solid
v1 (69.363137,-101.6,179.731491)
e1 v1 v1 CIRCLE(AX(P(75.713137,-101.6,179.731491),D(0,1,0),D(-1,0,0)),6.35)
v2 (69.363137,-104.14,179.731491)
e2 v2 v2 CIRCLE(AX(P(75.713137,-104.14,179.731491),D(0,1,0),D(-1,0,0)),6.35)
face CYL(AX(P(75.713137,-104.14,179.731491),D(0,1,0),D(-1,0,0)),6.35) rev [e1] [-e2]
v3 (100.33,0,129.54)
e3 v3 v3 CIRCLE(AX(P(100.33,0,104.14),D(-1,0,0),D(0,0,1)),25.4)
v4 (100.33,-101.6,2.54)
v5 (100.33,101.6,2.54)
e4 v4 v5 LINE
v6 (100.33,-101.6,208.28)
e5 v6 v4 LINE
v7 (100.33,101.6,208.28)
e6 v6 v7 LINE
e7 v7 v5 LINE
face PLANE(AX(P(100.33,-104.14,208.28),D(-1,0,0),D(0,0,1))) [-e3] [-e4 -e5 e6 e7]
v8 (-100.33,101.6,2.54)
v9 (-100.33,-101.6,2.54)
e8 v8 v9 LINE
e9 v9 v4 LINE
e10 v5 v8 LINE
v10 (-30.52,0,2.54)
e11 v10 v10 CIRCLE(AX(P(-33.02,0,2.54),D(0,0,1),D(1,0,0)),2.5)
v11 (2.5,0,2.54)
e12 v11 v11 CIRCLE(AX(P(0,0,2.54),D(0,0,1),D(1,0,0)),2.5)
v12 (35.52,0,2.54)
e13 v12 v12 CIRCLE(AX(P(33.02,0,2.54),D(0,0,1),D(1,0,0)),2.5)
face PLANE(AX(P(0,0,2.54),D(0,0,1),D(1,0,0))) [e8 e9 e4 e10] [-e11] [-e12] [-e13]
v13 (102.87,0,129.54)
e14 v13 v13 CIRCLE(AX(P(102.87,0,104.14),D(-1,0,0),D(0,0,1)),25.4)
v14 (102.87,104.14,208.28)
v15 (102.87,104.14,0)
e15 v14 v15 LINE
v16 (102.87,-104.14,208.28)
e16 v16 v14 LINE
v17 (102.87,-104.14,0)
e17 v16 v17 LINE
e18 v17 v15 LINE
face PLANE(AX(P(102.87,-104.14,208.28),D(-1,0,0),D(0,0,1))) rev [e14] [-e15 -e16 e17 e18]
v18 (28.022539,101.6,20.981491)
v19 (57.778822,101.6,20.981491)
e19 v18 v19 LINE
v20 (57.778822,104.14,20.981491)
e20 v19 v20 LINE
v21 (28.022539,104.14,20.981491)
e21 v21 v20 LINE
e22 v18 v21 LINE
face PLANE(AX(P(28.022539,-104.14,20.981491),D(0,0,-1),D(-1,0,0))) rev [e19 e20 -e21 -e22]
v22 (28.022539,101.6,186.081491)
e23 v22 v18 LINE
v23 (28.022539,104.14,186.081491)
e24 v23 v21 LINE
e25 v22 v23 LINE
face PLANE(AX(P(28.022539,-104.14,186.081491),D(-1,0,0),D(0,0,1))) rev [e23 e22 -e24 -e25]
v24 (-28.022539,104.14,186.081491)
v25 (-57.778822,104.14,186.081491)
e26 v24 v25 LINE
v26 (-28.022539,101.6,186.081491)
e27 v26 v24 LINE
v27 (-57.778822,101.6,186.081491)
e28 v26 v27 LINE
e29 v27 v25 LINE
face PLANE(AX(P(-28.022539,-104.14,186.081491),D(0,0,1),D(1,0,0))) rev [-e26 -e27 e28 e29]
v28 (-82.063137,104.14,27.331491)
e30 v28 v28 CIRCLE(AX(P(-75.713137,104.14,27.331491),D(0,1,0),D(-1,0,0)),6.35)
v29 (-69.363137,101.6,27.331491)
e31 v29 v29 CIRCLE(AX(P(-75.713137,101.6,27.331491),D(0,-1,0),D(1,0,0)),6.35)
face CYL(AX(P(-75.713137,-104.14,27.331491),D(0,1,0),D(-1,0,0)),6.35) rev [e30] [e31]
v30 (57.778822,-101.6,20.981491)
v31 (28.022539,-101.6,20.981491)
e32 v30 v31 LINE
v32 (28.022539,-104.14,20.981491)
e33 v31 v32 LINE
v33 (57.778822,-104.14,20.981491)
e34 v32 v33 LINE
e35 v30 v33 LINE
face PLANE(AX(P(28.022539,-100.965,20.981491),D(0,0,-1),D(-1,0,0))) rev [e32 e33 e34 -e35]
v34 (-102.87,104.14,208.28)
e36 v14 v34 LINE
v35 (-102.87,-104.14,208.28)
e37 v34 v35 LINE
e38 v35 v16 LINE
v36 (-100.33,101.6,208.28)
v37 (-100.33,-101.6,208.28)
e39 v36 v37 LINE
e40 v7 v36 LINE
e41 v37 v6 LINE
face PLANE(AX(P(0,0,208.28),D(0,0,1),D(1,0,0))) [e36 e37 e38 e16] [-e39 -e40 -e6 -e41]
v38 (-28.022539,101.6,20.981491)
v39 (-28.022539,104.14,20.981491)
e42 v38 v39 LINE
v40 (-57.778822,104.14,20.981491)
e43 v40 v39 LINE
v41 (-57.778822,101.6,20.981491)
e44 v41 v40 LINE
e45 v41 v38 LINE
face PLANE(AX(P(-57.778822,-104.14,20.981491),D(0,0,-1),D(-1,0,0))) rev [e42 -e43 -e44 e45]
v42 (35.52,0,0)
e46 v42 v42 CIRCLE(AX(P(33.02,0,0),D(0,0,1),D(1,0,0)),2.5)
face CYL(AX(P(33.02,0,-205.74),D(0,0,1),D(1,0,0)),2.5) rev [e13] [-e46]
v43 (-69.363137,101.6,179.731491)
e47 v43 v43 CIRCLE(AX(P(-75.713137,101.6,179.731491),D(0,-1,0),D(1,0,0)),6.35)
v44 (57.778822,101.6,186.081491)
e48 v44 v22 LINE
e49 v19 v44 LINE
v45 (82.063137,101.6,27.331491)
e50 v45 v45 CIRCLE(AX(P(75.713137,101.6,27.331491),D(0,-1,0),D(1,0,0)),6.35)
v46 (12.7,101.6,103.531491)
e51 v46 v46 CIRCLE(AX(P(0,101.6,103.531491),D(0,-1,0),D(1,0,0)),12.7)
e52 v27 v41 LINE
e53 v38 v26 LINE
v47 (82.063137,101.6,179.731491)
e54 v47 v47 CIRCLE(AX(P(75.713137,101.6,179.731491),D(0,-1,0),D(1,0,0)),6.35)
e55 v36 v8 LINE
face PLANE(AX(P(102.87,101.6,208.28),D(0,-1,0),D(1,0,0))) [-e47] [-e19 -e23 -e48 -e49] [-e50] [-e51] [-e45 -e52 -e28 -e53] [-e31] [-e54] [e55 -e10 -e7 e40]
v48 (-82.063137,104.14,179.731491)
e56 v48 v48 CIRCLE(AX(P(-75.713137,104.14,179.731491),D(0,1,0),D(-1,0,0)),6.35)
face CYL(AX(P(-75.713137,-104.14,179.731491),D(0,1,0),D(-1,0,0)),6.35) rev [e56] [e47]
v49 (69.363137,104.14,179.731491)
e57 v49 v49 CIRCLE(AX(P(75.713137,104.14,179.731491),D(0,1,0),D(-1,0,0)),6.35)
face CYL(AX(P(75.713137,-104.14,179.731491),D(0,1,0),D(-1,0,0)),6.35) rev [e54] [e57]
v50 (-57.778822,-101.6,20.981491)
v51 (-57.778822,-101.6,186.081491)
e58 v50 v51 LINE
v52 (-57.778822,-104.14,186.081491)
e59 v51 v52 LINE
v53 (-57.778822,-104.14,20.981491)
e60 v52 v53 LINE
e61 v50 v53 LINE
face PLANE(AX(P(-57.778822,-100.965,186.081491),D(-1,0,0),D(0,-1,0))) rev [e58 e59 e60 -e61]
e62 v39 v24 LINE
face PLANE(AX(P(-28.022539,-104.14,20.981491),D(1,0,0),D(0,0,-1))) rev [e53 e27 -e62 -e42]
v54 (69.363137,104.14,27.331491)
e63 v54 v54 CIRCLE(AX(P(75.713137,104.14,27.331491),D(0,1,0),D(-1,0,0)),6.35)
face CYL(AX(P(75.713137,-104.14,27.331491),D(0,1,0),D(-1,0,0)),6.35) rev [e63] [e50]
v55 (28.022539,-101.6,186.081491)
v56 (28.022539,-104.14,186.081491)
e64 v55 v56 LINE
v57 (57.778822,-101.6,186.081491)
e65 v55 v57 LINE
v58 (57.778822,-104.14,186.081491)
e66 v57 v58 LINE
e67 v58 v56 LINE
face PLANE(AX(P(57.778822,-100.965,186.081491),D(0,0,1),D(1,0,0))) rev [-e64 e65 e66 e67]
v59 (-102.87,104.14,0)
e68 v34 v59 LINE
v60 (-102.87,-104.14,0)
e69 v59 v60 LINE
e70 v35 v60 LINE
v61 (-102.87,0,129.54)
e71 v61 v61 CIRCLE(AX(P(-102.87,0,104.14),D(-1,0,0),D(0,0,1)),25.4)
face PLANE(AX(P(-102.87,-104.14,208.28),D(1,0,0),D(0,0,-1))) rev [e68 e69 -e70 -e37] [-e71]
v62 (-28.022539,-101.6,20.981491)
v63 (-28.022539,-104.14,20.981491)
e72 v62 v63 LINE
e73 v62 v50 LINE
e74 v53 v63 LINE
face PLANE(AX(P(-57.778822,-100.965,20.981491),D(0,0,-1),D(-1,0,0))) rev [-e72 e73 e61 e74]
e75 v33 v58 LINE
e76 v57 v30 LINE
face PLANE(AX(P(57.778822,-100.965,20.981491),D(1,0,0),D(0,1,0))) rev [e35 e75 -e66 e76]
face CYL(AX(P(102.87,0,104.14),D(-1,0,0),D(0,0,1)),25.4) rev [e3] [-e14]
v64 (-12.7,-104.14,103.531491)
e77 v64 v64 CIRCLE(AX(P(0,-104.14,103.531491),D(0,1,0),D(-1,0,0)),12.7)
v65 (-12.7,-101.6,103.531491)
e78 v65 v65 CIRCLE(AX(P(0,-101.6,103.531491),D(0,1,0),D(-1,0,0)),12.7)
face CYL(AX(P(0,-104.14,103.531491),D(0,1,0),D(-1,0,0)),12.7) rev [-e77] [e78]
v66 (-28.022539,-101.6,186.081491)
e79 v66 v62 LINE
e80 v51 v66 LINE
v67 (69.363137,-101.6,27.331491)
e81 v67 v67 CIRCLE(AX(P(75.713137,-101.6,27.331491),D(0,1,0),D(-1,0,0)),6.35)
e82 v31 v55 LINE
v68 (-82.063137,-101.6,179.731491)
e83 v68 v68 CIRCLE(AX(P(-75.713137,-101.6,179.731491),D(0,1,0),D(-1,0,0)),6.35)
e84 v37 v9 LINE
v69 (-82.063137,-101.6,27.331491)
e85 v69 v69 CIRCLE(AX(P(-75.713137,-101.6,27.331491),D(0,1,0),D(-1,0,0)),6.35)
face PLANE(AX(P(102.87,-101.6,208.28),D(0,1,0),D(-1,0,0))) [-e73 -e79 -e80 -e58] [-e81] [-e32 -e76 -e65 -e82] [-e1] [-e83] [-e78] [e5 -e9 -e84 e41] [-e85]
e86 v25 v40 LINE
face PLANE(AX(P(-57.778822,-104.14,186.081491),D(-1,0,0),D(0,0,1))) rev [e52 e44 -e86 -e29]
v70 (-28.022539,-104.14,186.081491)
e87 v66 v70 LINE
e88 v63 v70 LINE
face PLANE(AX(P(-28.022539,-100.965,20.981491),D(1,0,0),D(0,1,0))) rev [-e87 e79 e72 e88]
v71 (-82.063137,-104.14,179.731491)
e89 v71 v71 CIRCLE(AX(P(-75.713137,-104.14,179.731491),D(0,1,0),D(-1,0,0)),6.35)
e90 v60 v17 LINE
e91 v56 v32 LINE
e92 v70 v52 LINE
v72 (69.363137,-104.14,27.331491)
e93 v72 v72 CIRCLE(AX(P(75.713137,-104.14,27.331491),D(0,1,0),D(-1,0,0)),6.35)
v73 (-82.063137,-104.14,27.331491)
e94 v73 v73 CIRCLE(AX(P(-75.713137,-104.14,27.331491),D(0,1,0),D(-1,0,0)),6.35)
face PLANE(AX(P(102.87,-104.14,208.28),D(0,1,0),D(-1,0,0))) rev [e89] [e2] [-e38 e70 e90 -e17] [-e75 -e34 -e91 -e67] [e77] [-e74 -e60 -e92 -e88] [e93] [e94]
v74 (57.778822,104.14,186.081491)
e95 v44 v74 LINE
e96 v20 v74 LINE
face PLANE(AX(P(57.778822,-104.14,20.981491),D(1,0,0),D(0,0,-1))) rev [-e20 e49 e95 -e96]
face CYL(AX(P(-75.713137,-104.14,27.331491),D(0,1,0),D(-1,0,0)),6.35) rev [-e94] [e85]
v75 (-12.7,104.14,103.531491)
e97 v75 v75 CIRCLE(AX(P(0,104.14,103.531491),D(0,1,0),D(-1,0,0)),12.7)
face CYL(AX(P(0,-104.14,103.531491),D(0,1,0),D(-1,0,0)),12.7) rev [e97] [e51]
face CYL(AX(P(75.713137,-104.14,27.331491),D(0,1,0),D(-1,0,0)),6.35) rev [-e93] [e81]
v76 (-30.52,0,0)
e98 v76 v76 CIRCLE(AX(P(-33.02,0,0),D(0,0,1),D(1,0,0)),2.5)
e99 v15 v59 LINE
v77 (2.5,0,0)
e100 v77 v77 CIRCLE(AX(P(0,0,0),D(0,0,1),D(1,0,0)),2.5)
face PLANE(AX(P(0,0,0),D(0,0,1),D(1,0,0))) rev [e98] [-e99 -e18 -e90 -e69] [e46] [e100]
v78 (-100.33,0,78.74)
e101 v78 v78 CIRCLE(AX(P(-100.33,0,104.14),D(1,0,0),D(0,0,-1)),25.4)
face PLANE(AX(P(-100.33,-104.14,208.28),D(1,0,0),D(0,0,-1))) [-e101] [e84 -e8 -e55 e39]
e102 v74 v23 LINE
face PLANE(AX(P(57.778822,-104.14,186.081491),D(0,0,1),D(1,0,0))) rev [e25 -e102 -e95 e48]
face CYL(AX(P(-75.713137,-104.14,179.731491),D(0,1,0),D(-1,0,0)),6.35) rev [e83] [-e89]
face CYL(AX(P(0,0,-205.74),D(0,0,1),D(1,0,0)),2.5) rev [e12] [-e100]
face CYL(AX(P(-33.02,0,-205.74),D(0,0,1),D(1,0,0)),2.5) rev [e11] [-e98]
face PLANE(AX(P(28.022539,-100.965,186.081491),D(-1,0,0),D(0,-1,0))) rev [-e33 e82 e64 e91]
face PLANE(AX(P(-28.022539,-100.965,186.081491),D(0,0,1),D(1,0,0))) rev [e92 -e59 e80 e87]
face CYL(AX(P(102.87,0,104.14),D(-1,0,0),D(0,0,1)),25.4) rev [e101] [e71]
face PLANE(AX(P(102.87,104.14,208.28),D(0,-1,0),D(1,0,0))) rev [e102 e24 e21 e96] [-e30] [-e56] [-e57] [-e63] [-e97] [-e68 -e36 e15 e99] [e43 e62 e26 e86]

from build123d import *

# Parameters (mm, degrees)
SKETCH1_W               = 205.74
SKETCH1_H               = 208.28
BOSS_EXTRUDE1_DEPTH     = 208.28
SHELL1_T                = -2.54
CUT_EXTRUDE1_DEPTH      = 311.309108632
CUT_EXTRUDE1_DEPTH_BACK = 311.309108632
SKETCH2_R               = 12.7
SKETCH2_R_2             = 6.35
SKETCH4_R               = 2.5
CUT_EXTRUDE2_DEPTH      = 208.28
SKETCH5_W               = 17.056283611
SKETCH5_H               = 152.4
BOSS_EXTRUDE2_DEPTH     = 3.175
CHAMFER1_SIZE           = 6.35
SKETCH6_W               = 29.756283611
SKETCH6_H               = 165.1
CUT_EXTRUDE3_DEPTH      = 3.175
SKETCH7_R               = 25.4
CUT_EXTRUDE4_DEPTH      = 312.810864508
SKETCH8_W               = 29.756283611
SKETCH8_H               = 165.1
CUT_EXTRUDE5_DEPTH      = 315.127382323


with BuildPart() as part:
    # Sketch1 → Boss-Extrude1 (new body)
    with BuildSketch(Plane.XY):
        Rectangle(SKETCH1_W, SKETCH1_H)
    extrude(amount=BOSS_EXTRUDE1_DEPTH)

    # Shell1
    shell1_openings = [part.faces().sort_by_distance(p)[0] for p in [
        (0, 0, 208.28),
    ]]
    offset(amount=SHELL1_T, openings=shell1_openings, kind=Kind.INTERSECTION)

    # Sketch2 → Cut-Extrude1 (cut, two sides: drawn at the far end of the back side and taken through both)
    with BuildSketch(Plane(origin=(0, -101.6, 0), x_dir=(1, 0, 0), z_dir=(0, 1, 0)).offset(-CUT_EXTRUDE1_DEPTH_BACK)):
        with Locations(Location((0, -103.531491014, 0), (0, 0, 180))):
            Circle(SKETCH2_R)
        with Locations(Location((-75.713137358, -27.331491014, 0), (0, 0, 180))):
            Circle(SKETCH2_R_2)
        with Locations(Location((75.713137358, -27.331491014, 0), (0, 0, 180))):
            Circle(SKETCH2_R_2)
        with Locations(Location((75.713137358, -179.731491014, 0), (0, 0, 180))):
            Circle(SKETCH2_R_2)
        with Locations(Location((-75.713137358, -179.731491014, 0), (0, 0, 180))):
            Circle(SKETCH2_R_2)
    extrude(amount=CUT_EXTRUDE1_DEPTH + CUT_EXTRUDE1_DEPTH_BACK, mode=Mode.SUBTRACT)

    # Sketch4 → Cut-Extrude2 (cut)
    with BuildSketch(Plane.XY.offset(2.54)):
        Circle(SKETCH4_R)
        with Locations((33.02, 0)):
            Circle(SKETCH4_R)
        with Locations((-33.02, 0)):
            Circle(SKETCH4_R)
    extrude(amount=-CUT_EXTRUDE2_DEPTH, mode=Mode.SUBTRACT)

    # Sketch5 → Boss-Extrude2 (add)
    with BuildSketch(Plane(origin=(0, 104.14, 0), x_dir=(1, 0, 0), z_dir=(0, 1, 0))):
        with Locations((-42.900680362, -103.531491014)):
            Rectangle(SKETCH5_W, SKETCH5_H)
        with Locations((42.900680362, -103.531491014)):
            Rectangle(SKETCH5_W, SKETCH5_H)
    extrude(amount=BOSS_EXTRUDE2_DEPTH)

    # Chamfer1
    # the kernel refuses this chamfer: 6.35 mm, written as the material it adds along each edge
    with BuildSketch(Plane(origin=(51.428822168, 104.14, 179.731491014), x_dir=(0, -0.027495876610585696, 0.9996219169112966), z_dir=(-1, 0, 0))) as chamfer1_piece_1_section:
        Polygon((CHAMFER1_SIZE * 0.999621916911, CHAMFER1_SIZE * 0.0274958766106), (-CHAMFER1_SIZE * 0.0274958766106, CHAMFER1_SIZE * 0.999621916911), (0, 0), align=None)
    chamfer1_piece_1 = extrude(amount=17.05628361, mode=Mode.PRIVATE)
    chamfer1_piece_1 = split(chamfer1_piece_1, bisect_by=Plane(origin=(42.900680363, 107.315, 182.229587898), z_dir=(0, -1, 0)), keep=Keep.TOP, mode=Mode.PRIVATE)
    add(chamfer1_piece_1)
    with BuildSketch(Plane(origin=(51.428822168, 104.14, 27.331491014), x_dir=(0.9996219169112968, -0.027495876610583406, 0), z_dir=(0, 0, 1))) as chamfer1_piece_2_section:
        Polygon((CHAMFER1_SIZE * 0.999621916911, CHAMFER1_SIZE * 0.0274958766106), (-CHAMFER1_SIZE * 0.0274958766106, CHAMFER1_SIZE * 0.999621916911), (0, 0), align=None)
    chamfer1_piece_2 = extrude(amount=152.4, mode=Mode.PRIVATE)
    chamfer1_piece_2 = split(chamfer1_piece_2, bisect_by=Plane(origin=(53.926919052, 107.315, 103.531491014), z_dir=(0, -1, 0)), keep=Keep.TOP, mode=Mode.PRIVATE)
    add(chamfer1_piece_2)
    with BuildSketch(Plane(origin=(34.372538557, 104.14, 27.331491014), x_dir=(0, -0.027495876610585654, -0.9996219169112968), z_dir=(1, 0, 0))) as chamfer1_piece_3_section:
        Polygon((CHAMFER1_SIZE * 0.999621916911, CHAMFER1_SIZE * 0.0274958766106), (-CHAMFER1_SIZE * 0.0274958766106, CHAMFER1_SIZE * 0.999621916911), (0, 0), align=None)
    chamfer1_piece_3 = extrude(amount=17.05628361, mode=Mode.PRIVATE)
    chamfer1_piece_3 = split(chamfer1_piece_3, bisect_by=Plane(origin=(42.900680363, 107.315, 24.83339413), z_dir=(0, -1, 0)), keep=Keep.TOP, mode=Mode.PRIVATE)
    add(chamfer1_piece_3)
    with BuildSketch(Plane(origin=(34.372538557, 104.14, 179.731491014), x_dir=(-0.9996219169112968, -0.027495876610585685, 0), z_dir=(0, 0, -1))) as chamfer1_piece_4_section:
        Polygon((CHAMFER1_SIZE * 0.999621916911, CHAMFER1_SIZE * 0.0274958766106), (-CHAMFER1_SIZE * 0.0274958766106, CHAMFER1_SIZE * 0.999621916911), (0, 0), align=None)
    chamfer1_piece_4 = extrude(amount=152.4, mode=Mode.PRIVATE)
    chamfer1_piece_4 = split(chamfer1_piece_4, bisect_by=Plane(origin=(31.874441673, 107.315, 103.531491014), z_dir=(0, -1, 0)), keep=Keep.TOP, mode=Mode.PRIVATE)
    add(chamfer1_piece_4)
    with BuildSketch(Plane(origin=(-51.428822168, 104.14, 27.331491014), x_dir=(0, -0.027495876610585654, -0.9996219169112968), z_dir=(1, 0, 0))) as chamfer1_piece_5_section:
        Polygon((CHAMFER1_SIZE * 0.999621916911, CHAMFER1_SIZE * 0.0274958766106), (-CHAMFER1_SIZE * 0.0274958766106, CHAMFER1_SIZE * 0.999621916911), (0, 0), align=None)
    chamfer1_piece_5 = extrude(amount=17.05628361, mode=Mode.PRIVATE)
    chamfer1_piece_5 = split(chamfer1_piece_5, bisect_by=Plane(origin=(-42.900680363, 107.315, 24.83339413), z_dir=(0, -1, 0)), keep=Keep.TOP, mode=Mode.PRIVATE)
    add(chamfer1_piece_5)
    with BuildSketch(Plane(origin=(-51.428822168, 104.14, 179.731491014), x_dir=(-0.9996219169112966, -0.027495876610587812, 0), z_dir=(0, 0, -1))) as chamfer1_piece_6_section:
        Polygon((CHAMFER1_SIZE * 0.999621916911, CHAMFER1_SIZE * 0.0274958766106), (-CHAMFER1_SIZE * 0.0274958766106, CHAMFER1_SIZE * 0.999621916911), (0, 0), align=None)
    chamfer1_piece_6 = extrude(amount=152.4, mode=Mode.PRIVATE)
    chamfer1_piece_6 = split(chamfer1_piece_6, bisect_by=Plane(origin=(-53.926919052, 107.315, 103.531491014), z_dir=(0, -1, 0)), keep=Keep.TOP, mode=Mode.PRIVATE)
    add(chamfer1_piece_6)
    with BuildSketch(Plane(origin=(-34.372538557, 104.14, 179.731491014), x_dir=(0, -0.027495876610585696, 0.9996219169112966), z_dir=(-1, 0, 0))) as chamfer1_piece_7_section:
        Polygon((CHAMFER1_SIZE * 0.999621916911, CHAMFER1_SIZE * 0.0274958766106), (-CHAMFER1_SIZE * 0.0274958766106, CHAMFER1_SIZE * 0.999621916911), (0, 0), align=None)
    chamfer1_piece_7 = extrude(amount=17.05628361, mode=Mode.PRIVATE)
    chamfer1_piece_7 = split(chamfer1_piece_7, bisect_by=Plane(origin=(-42.900680363, 107.315, 182.229587898), z_dir=(0, -1, 0)), keep=Keep.TOP, mode=Mode.PRIVATE)
    add(chamfer1_piece_7)
    with BuildSketch(Plane(origin=(-34.372538557, 104.14, 27.331491014), x_dir=(0.9996219169112968, -0.027495876610585685, 0), z_dir=(0, 0, 1))) as chamfer1_piece_8_section:
        Polygon((CHAMFER1_SIZE * 0.999621916911, CHAMFER1_SIZE * 0.0274958766106), (-CHAMFER1_SIZE * 0.0274958766106, CHAMFER1_SIZE * 0.999621916911), (0, 0), align=None)
    chamfer1_piece_8 = extrude(amount=152.4, mode=Mode.PRIVATE)
    chamfer1_piece_8 = split(chamfer1_piece_8, bisect_by=Plane(origin=(-31.874441673, 107.315, 103.531491014), z_dir=(0, -1, 0)), keep=Keep.TOP, mode=Mode.PRIVATE)
    add(chamfer1_piece_8)
    with BuildSketch(Plane(origin=(67.759009141, 104.14, 179.731491014), x_dir=(0, -0.027495876610585696, 0.9996219169112966), z_dir=(-1, 0, 0))) as chamfer1_piece_9a_section:
        Polygon((CHAMFER1_SIZE * 0.999621916911, CHAMFER1_SIZE * 0.0274958766106), (-CHAMFER1_SIZE * 0.0274958766106, CHAMFER1_SIZE * 0.999621916911), (0, 0), align=None)
    chamfer1_piece_9a = extrude(amount=33.386470584, mode=Mode.PRIVATE)
    chamfer1_piece_9a = split(chamfer1_piece_9a, bisect_by=Plane(origin=(51.428822168, 105.46228774, 182.229587898), z_dir=(1, 0, 0)), keep=Keep.TOP, mode=Mode.PRIVATE)
    chamfer1_piece_9a = split(chamfer1_piece_9a, bisect_by=Plane(origin=(59.593915654, 107.315, 182.229587898), z_dir=(0, -1, 0)), keep=Keep.TOP, mode=Mode.PRIVATE)
    with BuildSketch(Plane(origin=(51.428822168, 104.14, 27.331491014), x_dir=(0.9996219169112968, -0.027495876610583406, 0), z_dir=(0, 0, 1))) as chamfer1_piece_9b_section:
        Polygon((CHAMFER1_SIZE * 0.999621916911, CHAMFER1_SIZE * 0.0274958766106), (-CHAMFER1_SIZE * 0.0274958766106, CHAMFER1_SIZE * 0.999621916911), (0, 0), align=None)
    chamfer1_piece_9b = extrude(amount=168.730186974, mode=Mode.PRIVATE)
    chamfer1_piece_9b = split(chamfer1_piece_9b, bisect_by=Plane(origin=(53.926919052, 105.46228774, 179.731491014), z_dir=(0, 0, 1)), keep=Keep.TOP, mode=Mode.PRIVATE)
    chamfer1_piece_9b = split(chamfer1_piece_9b, bisect_by=Plane(origin=(53.926919052, 107.315, 187.896584501), z_dir=(0, -1, 0)), keep=Keep.TOP, mode=Mode.PRIVATE)
    chamfer1_piece_9 = chamfer1_piece_9a & chamfer1_piece_9b
    add(chamfer1_piece_9)
    with BuildSketch(Plane(origin=(34.372538557, 104.14, 196.061677987), x_dir=(-0.9996219169112968, -0.027495876610585685, 0), z_dir=(0, 0, -1))) as chamfer1_piece_10a_section:
        Polygon((CHAMFER1_SIZE * 0.999621916911, CHAMFER1_SIZE * 0.0274958766106), (-CHAMFER1_SIZE * 0.0274958766106, CHAMFER1_SIZE * 0.999621916911), (0, 0), align=None)
    chamfer1_piece_10a = extrude(amount=168.730186974, mode=Mode.PRIVATE)
    chamfer1_piece_10a = split(chamfer1_piece_10a, bisect_by=Plane(origin=(31.874441673, 105.46228774, 179.731491014), z_dir=(0, 0, 1)), keep=Keep.TOP, mode=Mode.PRIVATE)
    chamfer1_piece_10a = split(chamfer1_piece_10a, bisect_by=Plane(origin=(31.874441673, 107.315, 187.896584501), z_dir=(0, -1, 0)), keep=Keep.TOP, mode=Mode.PRIVATE)
    with BuildSketch(Plane(origin=(51.428822168, 104.14, 179.731491014), x_dir=(0, -0.027495876610585696, 0.9996219169112966), z_dir=(-1, 0, 0))) as chamfer1_piece_10b_section:
        Polygon((CHAMFER1_SIZE * 0.999621916911, CHAMFER1_SIZE * 0.0274958766106), (-CHAMFER1_SIZE * 0.0274958766106, CHAMFER1_SIZE * 0.999621916911), (0, 0), align=None)
    chamfer1_piece_10b = extrude(amount=33.386470584, mode=Mode.PRIVATE)
    chamfer1_piece_10b = split(chamfer1_piece_10b, bisect_by=Plane(origin=(34.372538557, 105.46228774, 182.229587898), z_dir=(-1, 0, 0)), keep=Keep.TOP, mode=Mode.PRIVATE)
    chamfer1_piece_10b = split(chamfer1_piece_10b, bisect_by=Plane(origin=(26.207445071, 107.315, 182.229587898), z_dir=(0, -1, 0)), keep=Keep.TOP, mode=Mode.PRIVATE)
    chamfer1_piece_10 = chamfer1_piece_10a & chamfer1_piece_10b
    add(chamfer1_piece_10)
    with BuildSketch(Plane(origin=(51.428822168, 104.14, 11.00130404), x_dir=(0.9996219169112968, -0.027495876610583492, 0), z_dir=(0, 0, 1))) as chamfer1_piece_11a_section:
        Polygon((CHAMFER1_SIZE * 0.999621916911, CHAMFER1_SIZE * 0.0274958766106), (-CHAMFER1_SIZE * 0.0274958766106, CHAMFER1_SIZE * 0.999621916911), (0, 0), align=None)
    chamfer1_piece_11a = extrude(amount=168.730186974, mode=Mode.PRIVATE)
    chamfer1_piece_11a = split(chamfer1_piece_11a, bisect_by=Plane(origin=(53.926919052, 105.46228774, 27.331491014), z_dir=(0, 0, -1)), keep=Keep.TOP, mode=Mode.PRIVATE)
    chamfer1_piece_11a = split(chamfer1_piece_11a, bisect_by=Plane(origin=(53.926919052, 107.315, 19.166397527), z_dir=(0, -1, 0)), keep=Keep.TOP, mode=Mode.PRIVATE)
    with BuildSketch(Plane(origin=(34.372538557, 104.14, 27.331491014), x_dir=(0, -0.027495876610585654, -0.9996219169112968), z_dir=(1, 0, 0))) as chamfer1_piece_11b_section:
        Polygon((CHAMFER1_SIZE * 0.999621916911, CHAMFER1_SIZE * 0.0274958766106), (-CHAMFER1_SIZE * 0.0274958766106, CHAMFER1_SIZE * 0.999621916911), (0, 0), align=None)
    chamfer1_piece_11b = extrude(amount=33.386470584, mode=Mode.PRIVATE)
    chamfer1_piece_11b = split(chamfer1_piece_11b, bisect_by=Plane(origin=(51.428822168, 105.46228774, 24.83339413), z_dir=(1, 0, 0)), keep=Keep.TOP, mode=Mode.PRIVATE)
    chamfer1_piece_11b = split(chamfer1_piece_11b, bisect_by=Plane(origin=(59.593915654, 107.315, 24.83339413), z_dir=(0, -1, 0)), keep=Keep.TOP, mode=Mode.PRIVATE)
    chamfer1_piece_11 = chamfer1_piece_11a & chamfer1_piece_11b
    add(chamfer1_piece_11)
    with BuildSketch(Plane(origin=(34.372538557, 104.14, 179.731491014), x_dir=(-0.9996219169112968, -0.027495876610585685, 0), z_dir=(0, 0, -1))) as chamfer1_piece_12a_section:
        Polygon((CHAMFER1_SIZE * 0.999621916911, CHAMFER1_SIZE * 0.0274958766106), (-CHAMFER1_SIZE * 0.0274958766106, CHAMFER1_SIZE * 0.999621916911), (0, 0), align=None)
    chamfer1_piece_12a = extrude(amount=168.730186974, mode=Mode.PRIVATE)
    chamfer1_piece_12a = split(chamfer1_piece_12a, bisect_by=Plane(origin=(31.874441673, 105.46228774, 27.331491014), z_dir=(0, 0, -1)), keep=Keep.TOP, mode=Mode.PRIVATE)
    chamfer1_piece_12a = split(chamfer1_piece_12a, bisect_by=Plane(origin=(31.874441673, 107.315, 19.166397527), z_dir=(0, -1, 0)), keep=Keep.TOP, mode=Mode.PRIVATE)
    with BuildSketch(Plane(origin=(18.042351584, 104.14, 27.331491014), x_dir=(0, -0.027495876610585654, -0.9996219169112968), z_dir=(1, 0, 0))) as chamfer1_piece_12b_section:
        Polygon((CHAMFER1_SIZE * 0.999621916911, CHAMFER1_SIZE * 0.0274958766106), (-CHAMFER1_SIZE * 0.0274958766106, CHAMFER1_SIZE * 0.999621916911), (0, 0), align=None)
    chamfer1_piece_12b = extrude(amount=33.386470584, mode=Mode.PRIVATE)
    chamfer1_piece_12b = split(chamfer1_piece_12b, bisect_by=Plane(origin=(34.372538557, 105.46228774, 24.83339413), z_dir=(-1, 0, 0)), keep=Keep.TOP, mode=Mode.PRIVATE)
    chamfer1_piece_12b = split(chamfer1_piece_12b, bisect_by=Plane(origin=(26.207445071, 107.315, 24.83339413), z_dir=(0, -1, 0)), keep=Keep.TOP, mode=Mode.PRIVATE)
    chamfer1_piece_12 = chamfer1_piece_12a & chamfer1_piece_12b
    add(chamfer1_piece_12)
    with BuildSketch(Plane(origin=(-67.759009141, 104.14, 27.331491014), x_dir=(0, -0.027495876610585654, -0.9996219169112968), z_dir=(1, 0, 0))) as chamfer1_piece_13a_section:
        Polygon((CHAMFER1_SIZE * 0.999621916911, CHAMFER1_SIZE * 0.0274958766106), (-CHAMFER1_SIZE * 0.0274958766106, CHAMFER1_SIZE * 0.999621916911), (0, 0), align=None)
    chamfer1_piece_13a = extrude(amount=33.386470584, mode=Mode.PRIVATE)
    chamfer1_piece_13a = split(chamfer1_piece_13a, bisect_by=Plane(origin=(-51.428822168, 105.46228774, 24.83339413), z_dir=(-1, 0, 0)), keep=Keep.TOP, mode=Mode.PRIVATE)
    chamfer1_piece_13a = split(chamfer1_piece_13a, bisect_by=Plane(origin=(-59.593915654, 107.315, 24.83339413), z_dir=(0, -1, 0)), keep=Keep.TOP, mode=Mode.PRIVATE)
    with BuildSketch(Plane(origin=(-51.428822168, 104.14, 179.731491014), x_dir=(-0.9996219169112966, -0.027495876610587812, 0), z_dir=(0, 0, -1))) as chamfer1_piece_13b_section:
        Polygon((CHAMFER1_SIZE * 0.999621916911, CHAMFER1_SIZE * 0.0274958766106), (-CHAMFER1_SIZE * 0.0274958766106, CHAMFER1_SIZE * 0.999621916911), (0, 0), align=None)
    chamfer1_piece_13b = extrude(amount=168.730186974, mode=Mode.PRIVATE)
    chamfer1_piece_13b = split(chamfer1_piece_13b, bisect_by=Plane(origin=(-53.926919052, 105.46228774, 27.331491014), z_dir=(0, 0, -1)), keep=Keep.TOP, mode=Mode.PRIVATE)
    chamfer1_piece_13b = split(chamfer1_piece_13b, bisect_by=Plane(origin=(-53.926919052, 107.315, 19.166397527), z_dir=(0, -1, 0)), keep=Keep.TOP, mode=Mode.PRIVATE)
    chamfer1_piece_13 = chamfer1_piece_13a & chamfer1_piece_13b
    add(chamfer1_piece_13)
    with BuildSketch(Plane(origin=(-34.372538557, 104.14, 11.00130404), x_dir=(0.9996219169112968, -0.027495876610585685, 0), z_dir=(0, 0, 1))) as chamfer1_piece_14a_section:
        Polygon((CHAMFER1_SIZE * 0.999621916911, CHAMFER1_SIZE * 0.0274958766106), (-CHAMFER1_SIZE * 0.0274958766106, CHAMFER1_SIZE * 0.999621916911), (0, 0), align=None)
    chamfer1_piece_14a = extrude(amount=168.730186974, mode=Mode.PRIVATE)
    chamfer1_piece_14a = split(chamfer1_piece_14a, bisect_by=Plane(origin=(-31.874441673, 105.46228774, 27.331491014), z_dir=(0, 0, -1)), keep=Keep.TOP, mode=Mode.PRIVATE)
    chamfer1_piece_14a = split(chamfer1_piece_14a, bisect_by=Plane(origin=(-31.874441673, 107.315, 19.166397527), z_dir=(0, -1, 0)), keep=Keep.TOP, mode=Mode.PRIVATE)
    with BuildSketch(Plane(origin=(-51.428822168, 104.14, 27.331491014), x_dir=(0, -0.027495876610585654, -0.9996219169112968), z_dir=(1, 0, 0))) as chamfer1_piece_14b_section:
        Polygon((CHAMFER1_SIZE * 0.999621916911, CHAMFER1_SIZE * 0.0274958766106), (-CHAMFER1_SIZE * 0.0274958766106, CHAMFER1_SIZE * 0.999621916911), (0, 0), align=None)
    chamfer1_piece_14b = extrude(amount=33.386470584, mode=Mode.PRIVATE)
    chamfer1_piece_14b = split(chamfer1_piece_14b, bisect_by=Plane(origin=(-34.372538557, 105.46228774, 24.83339413), z_dir=(1, 0, 0)), keep=Keep.TOP, mode=Mode.PRIVATE)
    chamfer1_piece_14b = split(chamfer1_piece_14b, bisect_by=Plane(origin=(-26.207445071, 107.315, 24.83339413), z_dir=(0, -1, 0)), keep=Keep.TOP, mode=Mode.PRIVATE)
    chamfer1_piece_14 = chamfer1_piece_14a & chamfer1_piece_14b
    add(chamfer1_piece_14)
    with BuildSketch(Plane(origin=(-51.428822168, 104.14, 196.061677987), x_dir=(-0.9996219169112966, -0.027495876610587812, 0), z_dir=(0, 0, -1))) as chamfer1_piece_15a_section:
        Polygon((CHAMFER1_SIZE * 0.999621916911, CHAMFER1_SIZE * 0.0274958766106), (-CHAMFER1_SIZE * 0.0274958766106, CHAMFER1_SIZE * 0.999621916911), (0, 0), align=None)
    chamfer1_piece_15a = extrude(amount=168.730186974, mode=Mode.PRIVATE)
    chamfer1_piece_15a = split(chamfer1_piece_15a, bisect_by=Plane(origin=(-53.926919052, 105.46228774, 179.731491014), z_dir=(0, 0, 1)), keep=Keep.TOP, mode=Mode.PRIVATE)
    chamfer1_piece_15a = split(chamfer1_piece_15a, bisect_by=Plane(origin=(-53.926919052, 107.315, 187.896584501), z_dir=(0, -1, 0)), keep=Keep.TOP, mode=Mode.PRIVATE)
    with BuildSketch(Plane(origin=(-34.372538557, 104.14, 179.731491014), x_dir=(0, -0.027495876610585696, 0.9996219169112966), z_dir=(-1, 0, 0))) as chamfer1_piece_15b_section:
        Polygon((CHAMFER1_SIZE * 0.999621916911, CHAMFER1_SIZE * 0.0274958766106), (-CHAMFER1_SIZE * 0.0274958766106, CHAMFER1_SIZE * 0.999621916911), (0, 0), align=None)
    chamfer1_piece_15b = extrude(amount=33.386470584, mode=Mode.PRIVATE)
    chamfer1_piece_15b = split(chamfer1_piece_15b, bisect_by=Plane(origin=(-51.428822168, 105.46228774, 182.229587898), z_dir=(-1, 0, 0)), keep=Keep.TOP, mode=Mode.PRIVATE)
    chamfer1_piece_15b = split(chamfer1_piece_15b, bisect_by=Plane(origin=(-59.593915654, 107.315, 182.229587898), z_dir=(0, -1, 0)), keep=Keep.TOP, mode=Mode.PRIVATE)
    chamfer1_piece_15 = chamfer1_piece_15a & chamfer1_piece_15b
    add(chamfer1_piece_15)
    with BuildSketch(Plane(origin=(-34.372538557, 104.14, 27.331491014), x_dir=(0.9996219169112968, -0.027495876610585685, 0), z_dir=(0, 0, 1))) as chamfer1_piece_16a_section:
        Polygon((CHAMFER1_SIZE * 0.999621916911, CHAMFER1_SIZE * 0.0274958766106), (-CHAMFER1_SIZE * 0.0274958766106, CHAMFER1_SIZE * 0.999621916911), (0, 0), align=None)
    chamfer1_piece_16a = extrude(amount=168.730186974, mode=Mode.PRIVATE)
    chamfer1_piece_16a = split(chamfer1_piece_16a, bisect_by=Plane(origin=(-31.874441673, 105.46228774, 179.731491014), z_dir=(0, 0, 1)), keep=Keep.TOP, mode=Mode.PRIVATE)
    chamfer1_piece_16a = split(chamfer1_piece_16a, bisect_by=Plane(origin=(-31.874441673, 107.315, 187.896584501), z_dir=(0, -1, 0)), keep=Keep.TOP, mode=Mode.PRIVATE)
    with BuildSketch(Plane(origin=(-18.042351584, 104.14, 179.731491014), x_dir=(0, -0.027495876610585696, 0.9996219169112966), z_dir=(-1, 0, 0))) as chamfer1_piece_16b_section:
        Polygon((CHAMFER1_SIZE * 0.999621916911, CHAMFER1_SIZE * 0.0274958766106), (-CHAMFER1_SIZE * 0.0274958766106, CHAMFER1_SIZE * 0.999621916911), (0, 0), align=None)
    chamfer1_piece_16b = extrude(amount=33.386470584, mode=Mode.PRIVATE)
    chamfer1_piece_16b = split(chamfer1_piece_16b, bisect_by=Plane(origin=(-34.372538557, 105.46228774, 182.229587898), z_dir=(1, 0, 0)), keep=Keep.TOP, mode=Mode.PRIVATE)
    chamfer1_piece_16b = split(chamfer1_piece_16b, bisect_by=Plane(origin=(-26.207445071, 107.315, 182.229587898), z_dir=(0, -1, 0)), keep=Keep.TOP, mode=Mode.PRIVATE)
    chamfer1_piece_16 = chamfer1_piece_16a & chamfer1_piece_16b
    add(chamfer1_piece_16)

    # Sketch6 → Cut-Extrude3 (cut)
    with BuildSketch(Plane.XZ.offset(104.14)):
        with Locations((42.900680363, 103.531491014)):
            Rectangle(SKETCH6_W, SKETCH6_H)
        with Locations((-42.900680363, 103.531491014)):
            Rectangle(SKETCH6_W, SKETCH6_H)
    extrude(amount=-CUT_EXTRUDE3_DEPTH, mode=Mode.SUBTRACT)

    # Sketch7 → Cut-Extrude4 (cut, through all)
    with BuildSketch(Plane.ZY.offset(102.87)):
        with Locations((104.14, 0)):
            Circle(SKETCH7_R)
    extrude(amount=-CUT_EXTRUDE4_DEPTH, mode=Mode.SUBTRACT)

    # Sketch8 → Cut-Extrude5 (cut, through all)
    with BuildSketch(Plane(origin=(0, 107.315, 0), x_dir=(1, 0, 0), z_dir=(0, 1, 0))):
        with Locations((42.900680363, -103.531491014)):
            Rectangle(SKETCH8_W, SKETCH8_H)
        with Locations((-42.900680363, -103.531491014)):
            Rectangle(SKETCH8_W, SKETCH8_H)
    extrude(amount=-CUT_EXTRUDE5_DEPTH, mode=Mode.SUBTRACT)


solid = part.part
